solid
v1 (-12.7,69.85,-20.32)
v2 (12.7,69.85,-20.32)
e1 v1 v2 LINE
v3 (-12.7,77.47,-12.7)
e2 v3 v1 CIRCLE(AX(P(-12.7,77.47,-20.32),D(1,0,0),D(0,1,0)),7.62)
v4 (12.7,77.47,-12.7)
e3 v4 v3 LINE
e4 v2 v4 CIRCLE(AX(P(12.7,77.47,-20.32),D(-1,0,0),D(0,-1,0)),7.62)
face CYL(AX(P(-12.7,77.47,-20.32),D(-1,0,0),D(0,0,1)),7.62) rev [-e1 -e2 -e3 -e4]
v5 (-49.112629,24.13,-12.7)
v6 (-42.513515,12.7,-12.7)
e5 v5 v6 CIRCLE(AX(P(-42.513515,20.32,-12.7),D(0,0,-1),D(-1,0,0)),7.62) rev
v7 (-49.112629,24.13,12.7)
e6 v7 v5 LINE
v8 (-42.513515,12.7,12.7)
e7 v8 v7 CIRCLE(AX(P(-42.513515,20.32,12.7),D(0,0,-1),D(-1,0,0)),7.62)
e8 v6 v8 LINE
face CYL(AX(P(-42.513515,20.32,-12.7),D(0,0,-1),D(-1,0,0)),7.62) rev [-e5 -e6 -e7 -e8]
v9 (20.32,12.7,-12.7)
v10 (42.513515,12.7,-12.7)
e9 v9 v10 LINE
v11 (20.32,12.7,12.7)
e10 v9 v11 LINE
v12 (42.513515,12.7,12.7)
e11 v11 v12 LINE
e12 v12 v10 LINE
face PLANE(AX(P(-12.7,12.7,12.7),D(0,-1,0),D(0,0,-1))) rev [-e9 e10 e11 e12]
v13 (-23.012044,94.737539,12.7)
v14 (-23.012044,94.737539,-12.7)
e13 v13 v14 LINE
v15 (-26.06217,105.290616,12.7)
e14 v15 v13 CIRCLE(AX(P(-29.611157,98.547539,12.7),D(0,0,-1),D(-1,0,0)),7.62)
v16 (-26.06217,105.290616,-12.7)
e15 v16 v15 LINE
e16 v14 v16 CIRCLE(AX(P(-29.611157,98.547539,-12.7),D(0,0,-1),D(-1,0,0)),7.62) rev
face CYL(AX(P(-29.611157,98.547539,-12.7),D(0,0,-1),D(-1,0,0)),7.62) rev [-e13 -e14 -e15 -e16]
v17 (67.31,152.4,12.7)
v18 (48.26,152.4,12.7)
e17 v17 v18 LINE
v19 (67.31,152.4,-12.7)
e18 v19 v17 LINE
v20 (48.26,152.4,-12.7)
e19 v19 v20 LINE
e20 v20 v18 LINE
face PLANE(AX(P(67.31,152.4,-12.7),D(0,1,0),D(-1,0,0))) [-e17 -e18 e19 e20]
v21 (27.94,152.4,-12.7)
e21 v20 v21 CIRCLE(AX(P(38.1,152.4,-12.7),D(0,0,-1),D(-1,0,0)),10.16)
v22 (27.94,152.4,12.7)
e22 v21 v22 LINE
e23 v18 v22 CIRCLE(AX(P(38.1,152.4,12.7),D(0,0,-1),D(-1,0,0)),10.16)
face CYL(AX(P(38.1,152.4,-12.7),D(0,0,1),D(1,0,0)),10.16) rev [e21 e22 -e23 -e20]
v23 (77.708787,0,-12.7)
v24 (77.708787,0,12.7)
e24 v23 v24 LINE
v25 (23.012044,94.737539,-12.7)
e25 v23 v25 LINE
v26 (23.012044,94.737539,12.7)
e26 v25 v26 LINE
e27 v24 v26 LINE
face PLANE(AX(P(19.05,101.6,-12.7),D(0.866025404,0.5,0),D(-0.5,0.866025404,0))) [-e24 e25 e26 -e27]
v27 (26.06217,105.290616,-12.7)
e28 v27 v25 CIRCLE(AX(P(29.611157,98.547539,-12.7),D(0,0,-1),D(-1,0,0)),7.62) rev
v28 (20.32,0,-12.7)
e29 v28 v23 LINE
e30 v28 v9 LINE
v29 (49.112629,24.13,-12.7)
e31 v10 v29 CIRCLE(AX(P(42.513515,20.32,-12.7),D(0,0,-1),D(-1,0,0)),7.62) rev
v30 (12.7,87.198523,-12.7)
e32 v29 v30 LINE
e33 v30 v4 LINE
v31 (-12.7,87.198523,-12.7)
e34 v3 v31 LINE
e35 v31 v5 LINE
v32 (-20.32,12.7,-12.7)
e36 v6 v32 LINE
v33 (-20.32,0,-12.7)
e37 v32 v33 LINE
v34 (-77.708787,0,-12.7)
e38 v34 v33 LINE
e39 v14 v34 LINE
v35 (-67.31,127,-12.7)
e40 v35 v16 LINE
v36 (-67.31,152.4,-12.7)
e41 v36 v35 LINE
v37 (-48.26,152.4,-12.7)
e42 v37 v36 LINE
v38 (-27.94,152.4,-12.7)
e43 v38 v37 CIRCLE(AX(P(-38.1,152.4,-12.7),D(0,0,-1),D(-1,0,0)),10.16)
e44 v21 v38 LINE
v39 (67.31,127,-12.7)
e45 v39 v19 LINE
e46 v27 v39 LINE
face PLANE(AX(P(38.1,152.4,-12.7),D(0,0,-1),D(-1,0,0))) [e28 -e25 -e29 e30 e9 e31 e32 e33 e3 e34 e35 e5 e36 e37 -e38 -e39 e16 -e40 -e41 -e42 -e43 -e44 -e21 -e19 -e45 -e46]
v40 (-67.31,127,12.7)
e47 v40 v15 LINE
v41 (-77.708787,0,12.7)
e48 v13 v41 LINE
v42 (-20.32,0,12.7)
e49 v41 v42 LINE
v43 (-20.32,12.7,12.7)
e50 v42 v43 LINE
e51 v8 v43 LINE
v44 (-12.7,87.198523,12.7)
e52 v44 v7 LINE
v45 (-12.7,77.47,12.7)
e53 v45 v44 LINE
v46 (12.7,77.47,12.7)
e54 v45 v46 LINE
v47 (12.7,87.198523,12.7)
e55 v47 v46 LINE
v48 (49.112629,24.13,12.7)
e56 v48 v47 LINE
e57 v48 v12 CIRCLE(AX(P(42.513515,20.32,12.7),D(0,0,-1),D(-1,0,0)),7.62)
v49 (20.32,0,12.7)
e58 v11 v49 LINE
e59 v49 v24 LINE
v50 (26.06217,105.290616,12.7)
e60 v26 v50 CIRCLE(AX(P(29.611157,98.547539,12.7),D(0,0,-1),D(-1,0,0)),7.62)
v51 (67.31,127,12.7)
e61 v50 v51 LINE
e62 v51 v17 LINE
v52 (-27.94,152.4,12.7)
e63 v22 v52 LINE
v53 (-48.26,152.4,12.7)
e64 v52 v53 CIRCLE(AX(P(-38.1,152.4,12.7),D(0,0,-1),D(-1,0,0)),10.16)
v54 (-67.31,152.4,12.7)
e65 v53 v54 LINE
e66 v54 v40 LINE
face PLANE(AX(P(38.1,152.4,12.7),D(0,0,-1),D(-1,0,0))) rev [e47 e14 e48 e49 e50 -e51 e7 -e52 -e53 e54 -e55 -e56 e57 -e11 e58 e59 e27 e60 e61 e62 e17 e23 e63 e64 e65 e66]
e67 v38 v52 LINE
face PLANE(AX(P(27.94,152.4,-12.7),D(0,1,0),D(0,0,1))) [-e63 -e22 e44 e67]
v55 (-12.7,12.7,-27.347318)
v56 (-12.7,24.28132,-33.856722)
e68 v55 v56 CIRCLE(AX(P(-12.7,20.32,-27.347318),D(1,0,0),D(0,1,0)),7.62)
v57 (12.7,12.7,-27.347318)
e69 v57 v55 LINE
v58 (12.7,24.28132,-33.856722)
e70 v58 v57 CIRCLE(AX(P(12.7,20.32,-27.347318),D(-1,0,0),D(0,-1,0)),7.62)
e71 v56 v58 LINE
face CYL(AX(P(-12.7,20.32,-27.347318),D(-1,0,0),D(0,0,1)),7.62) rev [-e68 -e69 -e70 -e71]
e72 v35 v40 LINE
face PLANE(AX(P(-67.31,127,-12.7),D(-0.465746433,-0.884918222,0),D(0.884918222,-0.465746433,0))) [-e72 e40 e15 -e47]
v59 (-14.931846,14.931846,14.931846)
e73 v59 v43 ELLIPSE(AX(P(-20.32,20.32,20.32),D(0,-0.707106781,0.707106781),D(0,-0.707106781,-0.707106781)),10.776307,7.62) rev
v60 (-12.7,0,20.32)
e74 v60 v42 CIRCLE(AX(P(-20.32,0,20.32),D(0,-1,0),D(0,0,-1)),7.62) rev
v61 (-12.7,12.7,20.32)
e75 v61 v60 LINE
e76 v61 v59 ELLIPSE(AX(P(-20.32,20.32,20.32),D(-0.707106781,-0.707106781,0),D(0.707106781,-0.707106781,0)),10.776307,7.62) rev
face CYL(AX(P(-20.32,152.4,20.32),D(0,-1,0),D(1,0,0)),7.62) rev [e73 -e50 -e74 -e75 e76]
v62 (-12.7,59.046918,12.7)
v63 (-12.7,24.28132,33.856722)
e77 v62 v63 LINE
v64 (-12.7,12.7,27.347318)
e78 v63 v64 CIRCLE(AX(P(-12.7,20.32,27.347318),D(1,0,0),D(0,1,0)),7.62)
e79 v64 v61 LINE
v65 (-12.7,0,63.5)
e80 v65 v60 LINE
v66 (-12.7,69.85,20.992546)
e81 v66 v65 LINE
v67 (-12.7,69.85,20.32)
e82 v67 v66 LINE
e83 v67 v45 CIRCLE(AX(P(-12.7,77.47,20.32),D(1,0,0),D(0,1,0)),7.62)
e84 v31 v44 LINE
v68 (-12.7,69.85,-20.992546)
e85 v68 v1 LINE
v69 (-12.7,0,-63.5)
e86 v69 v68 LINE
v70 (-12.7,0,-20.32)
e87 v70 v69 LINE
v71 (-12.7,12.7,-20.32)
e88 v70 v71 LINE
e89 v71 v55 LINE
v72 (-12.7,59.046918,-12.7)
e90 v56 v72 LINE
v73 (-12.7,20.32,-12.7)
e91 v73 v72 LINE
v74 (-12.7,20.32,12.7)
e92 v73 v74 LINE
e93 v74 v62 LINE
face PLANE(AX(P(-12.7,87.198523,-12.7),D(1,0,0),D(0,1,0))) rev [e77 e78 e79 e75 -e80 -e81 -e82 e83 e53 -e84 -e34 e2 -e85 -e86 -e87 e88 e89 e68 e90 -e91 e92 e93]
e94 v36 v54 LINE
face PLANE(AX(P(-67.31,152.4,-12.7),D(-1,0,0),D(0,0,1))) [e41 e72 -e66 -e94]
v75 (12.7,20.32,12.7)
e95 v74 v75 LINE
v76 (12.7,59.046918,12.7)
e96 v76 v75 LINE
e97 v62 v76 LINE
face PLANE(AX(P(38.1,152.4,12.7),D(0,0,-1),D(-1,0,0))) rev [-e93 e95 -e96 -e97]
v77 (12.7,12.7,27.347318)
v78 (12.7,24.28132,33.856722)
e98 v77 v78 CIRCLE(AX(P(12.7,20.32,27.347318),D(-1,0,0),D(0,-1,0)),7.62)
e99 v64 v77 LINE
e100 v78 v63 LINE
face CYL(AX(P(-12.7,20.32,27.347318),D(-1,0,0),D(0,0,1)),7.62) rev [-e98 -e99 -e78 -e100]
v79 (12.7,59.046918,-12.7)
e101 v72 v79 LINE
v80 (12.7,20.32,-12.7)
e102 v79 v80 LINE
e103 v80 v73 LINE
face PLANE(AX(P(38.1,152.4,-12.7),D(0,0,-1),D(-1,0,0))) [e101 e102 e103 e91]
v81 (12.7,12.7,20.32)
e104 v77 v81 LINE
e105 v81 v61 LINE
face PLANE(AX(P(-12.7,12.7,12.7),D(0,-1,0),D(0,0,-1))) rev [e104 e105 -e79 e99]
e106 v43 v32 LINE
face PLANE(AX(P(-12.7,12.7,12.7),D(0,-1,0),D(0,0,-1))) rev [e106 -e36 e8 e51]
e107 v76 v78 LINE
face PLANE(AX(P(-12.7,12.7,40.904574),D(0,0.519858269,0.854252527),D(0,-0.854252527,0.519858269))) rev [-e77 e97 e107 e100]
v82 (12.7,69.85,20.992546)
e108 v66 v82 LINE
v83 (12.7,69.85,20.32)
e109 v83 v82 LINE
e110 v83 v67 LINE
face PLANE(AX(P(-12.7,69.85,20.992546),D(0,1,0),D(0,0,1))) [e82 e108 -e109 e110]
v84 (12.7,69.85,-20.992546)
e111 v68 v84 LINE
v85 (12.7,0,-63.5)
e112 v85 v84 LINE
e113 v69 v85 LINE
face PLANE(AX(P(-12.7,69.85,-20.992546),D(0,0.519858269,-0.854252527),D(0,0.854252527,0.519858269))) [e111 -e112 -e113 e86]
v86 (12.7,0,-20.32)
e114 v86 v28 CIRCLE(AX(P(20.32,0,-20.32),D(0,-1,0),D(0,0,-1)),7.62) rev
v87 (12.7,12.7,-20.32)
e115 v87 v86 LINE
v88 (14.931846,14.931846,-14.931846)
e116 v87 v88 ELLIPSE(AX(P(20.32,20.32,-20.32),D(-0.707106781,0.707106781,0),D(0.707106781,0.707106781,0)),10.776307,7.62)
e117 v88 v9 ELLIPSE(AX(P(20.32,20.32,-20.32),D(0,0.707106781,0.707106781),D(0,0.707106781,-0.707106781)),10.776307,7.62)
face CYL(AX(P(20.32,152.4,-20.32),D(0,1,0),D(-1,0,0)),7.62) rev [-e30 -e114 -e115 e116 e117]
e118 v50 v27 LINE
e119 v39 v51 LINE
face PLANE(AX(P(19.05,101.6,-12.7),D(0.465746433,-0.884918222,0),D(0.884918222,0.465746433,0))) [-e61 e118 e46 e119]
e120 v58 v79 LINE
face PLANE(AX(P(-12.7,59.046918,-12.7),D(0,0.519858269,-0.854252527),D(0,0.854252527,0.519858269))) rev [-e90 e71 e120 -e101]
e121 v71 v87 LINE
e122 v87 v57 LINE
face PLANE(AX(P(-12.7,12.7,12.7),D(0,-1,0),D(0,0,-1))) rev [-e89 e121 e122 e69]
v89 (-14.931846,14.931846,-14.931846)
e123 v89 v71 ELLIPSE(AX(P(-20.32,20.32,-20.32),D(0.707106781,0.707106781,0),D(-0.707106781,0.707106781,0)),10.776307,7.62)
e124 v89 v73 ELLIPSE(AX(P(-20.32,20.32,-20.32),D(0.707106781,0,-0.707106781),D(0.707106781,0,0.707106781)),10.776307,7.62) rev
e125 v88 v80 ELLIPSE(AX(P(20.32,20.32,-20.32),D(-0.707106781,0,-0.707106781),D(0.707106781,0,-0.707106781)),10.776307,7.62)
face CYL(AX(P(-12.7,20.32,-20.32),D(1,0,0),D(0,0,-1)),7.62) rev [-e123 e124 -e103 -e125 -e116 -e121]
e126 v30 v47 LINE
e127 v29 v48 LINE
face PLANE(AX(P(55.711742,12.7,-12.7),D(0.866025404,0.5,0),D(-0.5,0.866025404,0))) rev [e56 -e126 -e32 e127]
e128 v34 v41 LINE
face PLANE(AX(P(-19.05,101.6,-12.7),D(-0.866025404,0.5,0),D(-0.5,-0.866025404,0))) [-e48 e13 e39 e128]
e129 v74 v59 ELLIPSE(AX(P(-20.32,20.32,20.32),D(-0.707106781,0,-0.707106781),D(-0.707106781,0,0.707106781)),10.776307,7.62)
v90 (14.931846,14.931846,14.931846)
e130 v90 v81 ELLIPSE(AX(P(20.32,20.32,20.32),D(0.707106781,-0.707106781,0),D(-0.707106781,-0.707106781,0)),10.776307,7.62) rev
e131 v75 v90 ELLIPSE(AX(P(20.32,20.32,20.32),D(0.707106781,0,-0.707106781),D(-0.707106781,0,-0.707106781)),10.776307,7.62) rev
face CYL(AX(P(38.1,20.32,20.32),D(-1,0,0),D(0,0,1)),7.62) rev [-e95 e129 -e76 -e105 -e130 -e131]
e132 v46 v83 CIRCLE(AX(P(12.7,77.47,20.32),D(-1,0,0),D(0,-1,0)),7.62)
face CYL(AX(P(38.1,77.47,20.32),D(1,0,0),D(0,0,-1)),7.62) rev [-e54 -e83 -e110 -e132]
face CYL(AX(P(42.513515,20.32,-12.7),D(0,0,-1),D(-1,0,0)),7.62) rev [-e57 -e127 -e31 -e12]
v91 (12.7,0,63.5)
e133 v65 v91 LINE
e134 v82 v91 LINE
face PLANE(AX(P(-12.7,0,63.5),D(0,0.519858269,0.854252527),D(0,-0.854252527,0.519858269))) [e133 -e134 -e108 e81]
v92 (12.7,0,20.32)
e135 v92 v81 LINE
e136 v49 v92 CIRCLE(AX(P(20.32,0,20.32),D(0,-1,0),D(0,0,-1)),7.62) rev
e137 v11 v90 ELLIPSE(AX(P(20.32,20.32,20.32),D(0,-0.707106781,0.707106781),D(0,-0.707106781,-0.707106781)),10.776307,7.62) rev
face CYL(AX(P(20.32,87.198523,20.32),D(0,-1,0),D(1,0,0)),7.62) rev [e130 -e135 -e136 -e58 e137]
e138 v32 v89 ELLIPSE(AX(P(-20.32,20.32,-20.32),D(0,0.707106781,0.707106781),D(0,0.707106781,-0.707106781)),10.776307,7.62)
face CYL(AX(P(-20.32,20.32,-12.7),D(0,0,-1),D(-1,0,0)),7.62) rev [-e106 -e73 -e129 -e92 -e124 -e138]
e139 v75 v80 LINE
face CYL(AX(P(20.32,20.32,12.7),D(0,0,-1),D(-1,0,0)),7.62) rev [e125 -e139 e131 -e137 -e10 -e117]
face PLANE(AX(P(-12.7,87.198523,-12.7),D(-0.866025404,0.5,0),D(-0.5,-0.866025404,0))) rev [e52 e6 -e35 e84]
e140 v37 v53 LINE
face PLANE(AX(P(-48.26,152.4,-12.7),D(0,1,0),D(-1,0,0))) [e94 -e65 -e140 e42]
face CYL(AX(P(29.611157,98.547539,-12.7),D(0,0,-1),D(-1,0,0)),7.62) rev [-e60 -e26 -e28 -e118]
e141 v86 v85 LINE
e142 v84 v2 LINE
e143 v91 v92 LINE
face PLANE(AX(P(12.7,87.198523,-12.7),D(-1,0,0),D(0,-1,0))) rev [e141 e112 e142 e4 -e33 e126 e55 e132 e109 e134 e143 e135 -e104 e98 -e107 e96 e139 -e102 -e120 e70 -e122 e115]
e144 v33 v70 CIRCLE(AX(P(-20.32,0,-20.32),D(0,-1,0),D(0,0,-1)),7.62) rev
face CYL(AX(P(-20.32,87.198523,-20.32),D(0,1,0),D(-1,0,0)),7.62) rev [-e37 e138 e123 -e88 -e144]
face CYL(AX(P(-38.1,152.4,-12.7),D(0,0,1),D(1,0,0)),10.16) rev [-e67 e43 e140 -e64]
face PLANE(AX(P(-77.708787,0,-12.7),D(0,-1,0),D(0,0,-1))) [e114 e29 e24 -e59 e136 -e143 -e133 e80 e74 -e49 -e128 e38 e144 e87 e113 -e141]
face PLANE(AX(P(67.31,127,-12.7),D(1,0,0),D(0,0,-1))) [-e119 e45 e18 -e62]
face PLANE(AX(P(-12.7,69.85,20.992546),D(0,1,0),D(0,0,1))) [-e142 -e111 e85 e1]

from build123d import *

# Parameters (mm, degrees)
BOSS_EXTRUDE1_DEPTH      = 12.7
BOSS_EXTRUDE1_DEPTH_BACK = 12.7
BOSS_EXTRUDE2_DEPTH      = 12.7
BOSS_EXTRUDE2_DEPTH_BACK = 12.7
FILLET1_R                = 7.62
FILLET2_R                = 7.62
FILLET3_R                = 7.62


with BuildPart() as part:
    # Sketch1 → Boss-Extrude1 (new, two sides: drawn at the far end of the back side and taken through both)
    with BuildSketch(Plane.XY.offset(-BOSS_EXTRUDE1_DEPTH_BACK)):
        with BuildLine():
            Line((27.94, 152.4), (-27.94, 152.4))
            ThreePointArc((-27.94, 152.4), (-38.1, 142.24), (-48.26, 152.4))
            Line((-48.26, 152.4), (-67.31, 152.4))
            Line((-67.31, 152.4), (-67.31, 127))
            Line((-67.31, 127), (-19.05, 101.6))
            Line((-19.05, 101.6), (-77.70878735, 0))
            Line((-77.70878735, 0), (77.70878735, 0))
            Line((77.70878735, 0), (19.05, 101.6))
            Line((19.05, 101.6), (67.31, 127))
            Line((67.31, 127), (67.31, 152.4))
            Line((67.31, 152.4), (48.26, 152.4))
            ThreePointArc((48.26, 152.4), (38.1, 142.24), (27.94, 152.4))
        make_face()
        Polygon((-55.711742094, 12.7), (-12.7, 12.7), (-12.7, 87.198522628), align=None, mode=Mode.SUBTRACT)
        Polygon((12.7, 87.198522628), (12.7, 12.7), (55.711742094, 12.7), align=None, mode=Mode.SUBTRACT)
    extrude(amount=BOSS_EXTRUDE1_DEPTH + BOSS_EXTRUDE1_DEPTH_BACK)

    # Sketch2 → Boss-Extrude2 (add, two sides: drawn at the far end of the back side and taken through both)
    with BuildSketch(Plane(origin=(0, 0, 0), x_dir=(0, 0, -1), z_dir=(1, 0, 0)).offset(-BOSS_EXTRUDE2_DEPTH_BACK)):
        Polygon((20.992545931, 69.85), (63.5, 0), (-63.5, 0), (-20.992545931, 69.85), align=None)
        Polygon((12.7, 59.046917663), (40.904573712, 12.7), (12.7, 12.7), align=None, mode=Mode.SUBTRACT)
        Polygon((-12.7, 59.046917663), (-12.7, 12.7), (-40.904573712, 12.7), align=None, mode=Mode.SUBTRACT)
    extrude(amount=BOSS_EXTRUDE2_DEPTH + BOSS_EXTRUDE2_DEPTH_BACK)

    # Fillet1
    fillet1_edges = [part.edges().sort_by_distance(p)[0] for p in [
        (0, 69.85, -12.7),
        (0, 69.85, 12.7),
    ]]
    fillet(fillet1_edges, radius=FILLET1_R)

    # Fillet2
    # the kernel refuses this fillet: 7.62 mm, written as the material it adds along each edge
    with BuildSketch(Plane(origin=(12.7, 12.7, -12.7), x_dir=(0, 0, -1), z_dir=(0, -1, 0)), Plane(origin=(12.7, 12.7, 12.7), x_dir=(1, 0, 0), z_dir=(0, -1, 0))) as fillet2_piece_1:
        with BuildLine():
            CenterArc((FILLET2_R, FILLET2_R), FILLET2_R, 180, 90)
            Line((0, FILLET2_R), (0, 0))
            Line((0, 0), (FILLET2_R, 0))
        make_face()
    extrude(amount=12.7)
    with BuildSketch(Plane(origin=(-12.7, 12.7, -12.7), x_dir=(0, 0, -1), z_dir=(0, -1, 0)), Plane(origin=(-12.7, 12.7, 12.7), x_dir=(-1, 0, 0), z_dir=(0, -1, 0))) as fillet2_piece_2:
        with BuildLine():
            CenterArc((FILLET2_R, -FILLET2_R), FILLET2_R, 90, 90)
            Line((0, -FILLET2_R), (0, 0))
            Line((0, 0), (FILLET2_R, 0))
        make_face()
    extrude(amount=12.7)
    with BuildSketch(Plane(origin=(12.7, 12.7, -40.904573712), x_dir=(0, 0, 1), z_dir=(-1, 0, 0)), Plane(origin=(12.7, 12.7, 40.904573712), x_dir=(0, 0.8542525273339658, -0.5198582687074736), z_dir=(-1, 0, 0))) as fillet2_piece_3:
        with BuildLine():
            CenterArc((FILLET2_R * 1.77916742424, FILLET2_R), FILLET2_R, 148.677255076, 121.322744924)
            Line((FILLET2_R * 0.924914896906, FILLET2_R * 1.51985826871), (0, 0))
            Line((0, 0), (FILLET2_R * 1.77916742424, 0))
        make_face()
    extrude(amount=25.4)
    with BuildSketch(Plane(origin=(19.05, 101.6, -12.7), x_dir=(0.4999999999999972, -0.8660254037844403, 0), z_dir=(0, 0, 1))) as fillet2_piece_4:
        with BuildLine():
            CenterArc((FILLET2_R * 1.03990652475, FILLET2_R), FILLET2_R, 177.758540601, 92.241459399)
            Line((FILLET2_R * 0.0406716474833, FILLET2_R * 1.03911086864), (0, 0))
            Line((0, 0), (FILLET2_R * 1.03990652475, 0))
        make_face()
    extrude(amount=25.4)
    with BuildSketch(Plane(origin=(-19.05, 101.6, -12.7), x_dir=(-0.4999999999999979, -0.8660254037844399, 0), z_dir=(0, 0, 1))) as fillet2_piece_5:
        with BuildLine():
            CenterArc((FILLET2_R * 1.03990652475, -FILLET2_R), FILLET2_R, 90, 92.241459399)
            Line((FILLET2_R * 0.0406716474833, -FILLET2_R * 1.03911086864), (0, 0))
            Line((0, 0), (FILLET2_R * 1.03990652475, 0))
        make_face()
    extrude(amount=25.4)
    with BuildSketch(Plane(origin=(-55.711742094, 12.7, 12.7), x_dir=(0.49999999999999845, 0.8660254037844396, 0), z_dir=(0, 0, -1)), Plane(origin=(55.711742094, 12.7, -12.7), x_dir=(-0.4999999999999981, 0.8660254037844397, 0), z_dir=(0, 0, 1))) as fillet2_piece_6:
        with BuildLine():
            CenterArc((FILLET2_R * 1.73205080757, FILLET2_R), FILLET2_R, 150, 120)
            Line((FILLET2_R * 0.866025403784, FILLET2_R * 1.5), (0, 0))
            Line((0, 0), (FILLET2_R * 1.73205080757, 0))
        make_face()
    extrude(amount=25.4)

    # Fillet3
    # the kernel refuses this fillet: 7.62 mm, written as the material it adds along each edge
    with BuildSketch(Plane(origin=(12.7, 12.7, -12.7), x_dir=(1, 0, 0), z_dir=(0, 0, 1)), Plane(origin=(12.7, 12.7, 12.7), x_dir=(0, 0, 1), z_dir=(-1, 0, 0))) as fillet3_piece_1:
        with BuildLine():
            CenterArc((FILLET3_R, FILLET3_R), FILLET3_R, 180, 90)
            Line((0, FILLET3_R), (0, 0))
            Line((0, 0), (FILLET3_R, 0))
        make_face()
    extrude(amount=25.4)
    with BuildSketch(Plane(origin=(12.7, 12.7, -12.7), x_dir=(0, 0, -1), z_dir=(-1, 0, 0)), Plane(origin=(-12.7, 12.7, -12.7), x_dir=(-1, 0, 0), z_dir=(0, 0, 1))) as fillet3_piece_2:
        with BuildLine():
            CenterArc((FILLET3_R, -FILLET3_R), FILLET3_R, 90, 90)
            Line((0, -FILLET3_R), (0, 0))
            Line((0, 0), (FILLET3_R, 0))
        make_face()
    extrude(amount=25.4)
    with BuildSketch(Plane(origin=(31.75, 12.7, -12.7), x_dir=(0, 0, -1), z_dir=(-1, 0, 0))) as fillet3_piece_3a_section:
        with BuildLine():
            CenterArc((FILLET3_R, -FILLET3_R), FILLET3_R, 90, 90)
            Line((0, -FILLET3_R), (0, 0))
            Line((0, 0), (FILLET3_R, 0))
        make_face()
    fillet3_piece_3a = extrude(amount=44.45, mode=Mode.PRIVATE)
    fillet3_piece_3a = split(fillet3_piece_3a, bisect_by=Plane(origin=(12.7, 14.893212432, -14.893212432), z_dir=(1, 0, 0)), keep=Keep.TOP, mode=Mode.PRIVATE)
    fillet3_piece_3a = fillet3_piece_3a - Plane(origin=(20.32, 14.893212432, -20.32), x_dir=(0, 0, -1), z_dir=(0, 1, 0)) * Cylinder(7.62, 120, mode=Mode.PRIVATE)
    with BuildSketch(Plane(origin=(12.7, 12.7, -31.75), x_dir=(1, 0, 0), z_dir=(0, 0, 1))) as fillet3_piece_3b_section:
        with BuildLine():
            CenterArc((FILLET3_R, FILLET3_R), FILLET3_R, 180, 90)
            Line((0, FILLET3_R), (0, 0))
            Line((0, 0), (FILLET3_R, 0))
        make_face()
    fillet3_piece_3b = extrude(amount=44.45, mode=Mode.PRIVATE)
    fillet3_piece_3b = fillet3_piece_3b - Plane(origin=(20.32, 13.018424072, -20.32), x_dir=(0, 0, -1), z_dir=(0, 1, 0)) * Cylinder(7.62, 120, mode=Mode.PRIVATE)
    fillet3_piece_3b = split(fillet3_piece_3b, bisect_by=Plane(origin=(17.997172091, 13.018424072, -12.7), z_dir=(0, 0, -1)), keep=Keep.TOP, mode=Mode.PRIVATE)
    fillet3_piece_3b = fillet3_piece_3b - Plane(origin=(17.997172091, 20.32, -27.347317939), x_dir=(0, 0, 1), z_dir=(1, 0, 0)) * Cylinder(7.62, 120, mode=Mode.PRIVATE)
    fillet3_piece_3 = fillet3_piece_3a & fillet3_piece_3b
    add(fillet3_piece_3)
    with BuildSketch(Plane(origin=(31.75, 12.7, 12.7), x_dir=(0, 0, 1), z_dir=(-1, 0, 0))) as fillet3_piece_4a_section:
        with BuildLine():
            CenterArc((FILLET3_R, FILLET3_R), FILLET3_R, 180, 90)
            Line((0, FILLET3_R), (0, 0))
            Line((0, 0), (FILLET3_R, 0))
        make_face()
    fillet3_piece_4a = extrude(amount=44.45, mode=Mode.PRIVATE)
    fillet3_piece_4a = fillet3_piece_4a - Plane(origin=(20.32, 14.893212432, 20.32), x_dir=(1, 0, 0), z_dir=(0, 1, 0)) * Cylinder(7.62, 120, mode=Mode.PRIVATE)
    fillet3_piece_4a = split(fillet3_piece_4a, bisect_by=Plane(origin=(12.7, 14.893212432, 14.893212432), z_dir=(1, 0, 0)), keep=Keep.TOP, mode=Mode.PRIVATE)
    with BuildSketch(Plane(origin=(12.7, 12.7, -12.7), x_dir=(1, 0, 0), z_dir=(0, 0, 1))) as fillet3_piece_4b_section:
        with BuildLine():
            CenterArc((FILLET3_R, FILLET3_R), FILLET3_R, 180, 90)
            Line((0, FILLET3_R), (0, 0))
            Line((0, 0), (FILLET3_R, 0))
        make_face()
    fillet3_piece_4b = extrude(amount=44.45, mode=Mode.PRIVATE)
    fillet3_piece_4b = split(fillet3_piece_4b, bisect_by=Plane(origin=(14.346750692, 12.818924561, 12.7), z_dir=(0, 0, 1)), keep=Keep.TOP, mode=Mode.PRIVATE)
    fillet3_piece_4b = fillet3_piece_4b - Plane(origin=(20.32, 12.818924561, 20.32), x_dir=(1, 0, 0), z_dir=(0, 1, 0)) * Cylinder(7.62, 120, mode=Mode.PRIVATE)
    fillet3_piece_4b = fillet3_piece_4b - Plane(origin=(14.346750692, 20.32, 27.347317939), x_dir=(0, 0.8542525273341854, -0.5198582687071128), z_dir=(1, 0, 0)) * Cylinder(7.62, 120, mode=Mode.PRIVATE)
    fillet3_piece_4 = fillet3_piece_4a & fillet3_piece_4b
    add(fillet3_piece_4)
    with BuildSketch(Plane(origin=(-12.7, 12.7, -31.75), x_dir=(-1, 0, 0), z_dir=(0, 0, 1))) as fillet3_piece_5a_section:
        with BuildLine():
            CenterArc((FILLET3_R, -FILLET3_R), FILLET3_R, 90, 90)
            Line((0, -FILLET3_R), (0, 0))
            Line((0, 0), (FILLET3_R, 0))
        make_face()
    fillet3_piece_5a = extrude(amount=44.45, mode=Mode.PRIVATE)
    fillet3_piece_5a = split(fillet3_piece_5a, bisect_by=Plane(origin=(-17.997172063, 13.018423982, -12.7), z_dir=(0, 0, -1)), keep=Keep.TOP, mode=Mode.PRIVATE)
    fillet3_piece_5a = fillet3_piece_5a - Plane(origin=(-20.32, 13.018423982, -20.32), x_dir=(0, 0, -1), z_dir=(0, 1, 0)) * Cylinder(7.62, 120, mode=Mode.PRIVATE)
    fillet3_piece_5a = fillet3_piece_5a - Plane(origin=(-17.997172063, 20.32, -27.347317939), x_dir=(0, 0, 1), z_dir=(1, 0, 0)) * Cylinder(7.62, 120, mode=Mode.PRIVATE)
    with BuildSketch(Plane(origin=(12.7, 12.7, -12.7), x_dir=(0, 0, -1), z_dir=(-1, 0, 0))) as fillet3_piece_5b_section:
        with BuildLine():
            CenterArc((FILLET3_R, -FILLET3_R), FILLET3_R, 90, 90)
            Line((0, -FILLET3_R), (0, 0))
            Line((0, 0), (FILLET3_R, 0))
        make_face()
    fillet3_piece_5b = extrude(amount=44.45, mode=Mode.PRIVATE)
    fillet3_piece_5b = fillet3_piece_5b - Plane(origin=(-20.32, 20.265363421, -20.32), x_dir=(0, 0, -1), z_dir=(0, 1, 0)) * Cylinder(7.62, 120, mode=Mode.PRIVATE)
    fillet3_piece_5b = split(fillet3_piece_5b, bisect_by=Plane(origin=(-12.7, 20.265363421, -12.6238), z_dir=(-1, 0, 0)), keep=Keep.TOP, mode=Mode.PRIVATE)
    fillet3_piece_5 = fillet3_piece_5a & fillet3_piece_5b
    add(fillet3_piece_5)
    with BuildSketch(Plane(origin=(-12.7, 12.7, -12.7), x_dir=(-1, 0, 0), z_dir=(0, 0, 1))) as fillet3_piece_6a_section:
        with BuildLine():
            CenterArc((FILLET3_R, -FILLET3_R), FILLET3_R, 90, 90)
            Line((0, -FILLET3_R), (0, 0))
            Line((0, 0), (FILLET3_R, 0))
        make_face()
    fillet3_piece_6a = extrude(amount=44.45, mode=Mode.PRIVATE)
    fillet3_piece_6a = fillet3_piece_6a - Plane(origin=(-20.32, 16.148179969, 20.32), x_dir=(-1, 0, 0), z_dir=(0, 1, 0)) * Cylinder(7.62, 120, mode=Mode.PRIVATE)
    fillet3_piece_6a = split(fillet3_piece_6a, bisect_by=Plane(origin=(-12.657850187, 16.148179969, 12.7), z_dir=(0, 0, 1)), keep=Keep.TOP, mode=Mode.PRIVATE)
    fillet3_piece_6a = fillet3_piece_6a - Plane(origin=(-12.657850187, 20.32, 27.347317939), x_dir=(0, 0.8542525273341854, -0.5198582687071128), z_dir=(1, 0, 0)) * Cylinder(7.62, 120, mode=Mode.PRIVATE)
    with BuildSketch(Plane(origin=(12.7, 12.7, 12.7), x_dir=(0, 0, 1), z_dir=(-1, 0, 0))) as fillet3_piece_6b_section:
        with BuildLine():
            CenterArc((FILLET3_R, FILLET3_R), FILLET3_R, 180, 90)
            Line((0, FILLET3_R), (0, 0))
            Line((0, 0), (FILLET3_R, 0))
        make_face()
    fillet3_piece_6b = extrude(amount=44.45, mode=Mode.PRIVATE)
    fillet3_piece_6b = split(fillet3_piece_6b, bisect_by=Plane(origin=(-12.7, 20.265363421, 12.6238), z_dir=(-1, 0, 0)), keep=Keep.TOP, mode=Mode.PRIVATE)
    fillet3_piece_6b = fillet3_piece_6b - Plane(origin=(-20.32, 20.265363421, 20.32), x_dir=(-1, 0, 0), z_dir=(0, 1, 0)) * Cylinder(7.62, 120, mode=Mode.PRIVATE)
    fillet3_piece_6 = fillet3_piece_6a & fillet3_piece_6b
    add(fillet3_piece_6)


solid = part.part
